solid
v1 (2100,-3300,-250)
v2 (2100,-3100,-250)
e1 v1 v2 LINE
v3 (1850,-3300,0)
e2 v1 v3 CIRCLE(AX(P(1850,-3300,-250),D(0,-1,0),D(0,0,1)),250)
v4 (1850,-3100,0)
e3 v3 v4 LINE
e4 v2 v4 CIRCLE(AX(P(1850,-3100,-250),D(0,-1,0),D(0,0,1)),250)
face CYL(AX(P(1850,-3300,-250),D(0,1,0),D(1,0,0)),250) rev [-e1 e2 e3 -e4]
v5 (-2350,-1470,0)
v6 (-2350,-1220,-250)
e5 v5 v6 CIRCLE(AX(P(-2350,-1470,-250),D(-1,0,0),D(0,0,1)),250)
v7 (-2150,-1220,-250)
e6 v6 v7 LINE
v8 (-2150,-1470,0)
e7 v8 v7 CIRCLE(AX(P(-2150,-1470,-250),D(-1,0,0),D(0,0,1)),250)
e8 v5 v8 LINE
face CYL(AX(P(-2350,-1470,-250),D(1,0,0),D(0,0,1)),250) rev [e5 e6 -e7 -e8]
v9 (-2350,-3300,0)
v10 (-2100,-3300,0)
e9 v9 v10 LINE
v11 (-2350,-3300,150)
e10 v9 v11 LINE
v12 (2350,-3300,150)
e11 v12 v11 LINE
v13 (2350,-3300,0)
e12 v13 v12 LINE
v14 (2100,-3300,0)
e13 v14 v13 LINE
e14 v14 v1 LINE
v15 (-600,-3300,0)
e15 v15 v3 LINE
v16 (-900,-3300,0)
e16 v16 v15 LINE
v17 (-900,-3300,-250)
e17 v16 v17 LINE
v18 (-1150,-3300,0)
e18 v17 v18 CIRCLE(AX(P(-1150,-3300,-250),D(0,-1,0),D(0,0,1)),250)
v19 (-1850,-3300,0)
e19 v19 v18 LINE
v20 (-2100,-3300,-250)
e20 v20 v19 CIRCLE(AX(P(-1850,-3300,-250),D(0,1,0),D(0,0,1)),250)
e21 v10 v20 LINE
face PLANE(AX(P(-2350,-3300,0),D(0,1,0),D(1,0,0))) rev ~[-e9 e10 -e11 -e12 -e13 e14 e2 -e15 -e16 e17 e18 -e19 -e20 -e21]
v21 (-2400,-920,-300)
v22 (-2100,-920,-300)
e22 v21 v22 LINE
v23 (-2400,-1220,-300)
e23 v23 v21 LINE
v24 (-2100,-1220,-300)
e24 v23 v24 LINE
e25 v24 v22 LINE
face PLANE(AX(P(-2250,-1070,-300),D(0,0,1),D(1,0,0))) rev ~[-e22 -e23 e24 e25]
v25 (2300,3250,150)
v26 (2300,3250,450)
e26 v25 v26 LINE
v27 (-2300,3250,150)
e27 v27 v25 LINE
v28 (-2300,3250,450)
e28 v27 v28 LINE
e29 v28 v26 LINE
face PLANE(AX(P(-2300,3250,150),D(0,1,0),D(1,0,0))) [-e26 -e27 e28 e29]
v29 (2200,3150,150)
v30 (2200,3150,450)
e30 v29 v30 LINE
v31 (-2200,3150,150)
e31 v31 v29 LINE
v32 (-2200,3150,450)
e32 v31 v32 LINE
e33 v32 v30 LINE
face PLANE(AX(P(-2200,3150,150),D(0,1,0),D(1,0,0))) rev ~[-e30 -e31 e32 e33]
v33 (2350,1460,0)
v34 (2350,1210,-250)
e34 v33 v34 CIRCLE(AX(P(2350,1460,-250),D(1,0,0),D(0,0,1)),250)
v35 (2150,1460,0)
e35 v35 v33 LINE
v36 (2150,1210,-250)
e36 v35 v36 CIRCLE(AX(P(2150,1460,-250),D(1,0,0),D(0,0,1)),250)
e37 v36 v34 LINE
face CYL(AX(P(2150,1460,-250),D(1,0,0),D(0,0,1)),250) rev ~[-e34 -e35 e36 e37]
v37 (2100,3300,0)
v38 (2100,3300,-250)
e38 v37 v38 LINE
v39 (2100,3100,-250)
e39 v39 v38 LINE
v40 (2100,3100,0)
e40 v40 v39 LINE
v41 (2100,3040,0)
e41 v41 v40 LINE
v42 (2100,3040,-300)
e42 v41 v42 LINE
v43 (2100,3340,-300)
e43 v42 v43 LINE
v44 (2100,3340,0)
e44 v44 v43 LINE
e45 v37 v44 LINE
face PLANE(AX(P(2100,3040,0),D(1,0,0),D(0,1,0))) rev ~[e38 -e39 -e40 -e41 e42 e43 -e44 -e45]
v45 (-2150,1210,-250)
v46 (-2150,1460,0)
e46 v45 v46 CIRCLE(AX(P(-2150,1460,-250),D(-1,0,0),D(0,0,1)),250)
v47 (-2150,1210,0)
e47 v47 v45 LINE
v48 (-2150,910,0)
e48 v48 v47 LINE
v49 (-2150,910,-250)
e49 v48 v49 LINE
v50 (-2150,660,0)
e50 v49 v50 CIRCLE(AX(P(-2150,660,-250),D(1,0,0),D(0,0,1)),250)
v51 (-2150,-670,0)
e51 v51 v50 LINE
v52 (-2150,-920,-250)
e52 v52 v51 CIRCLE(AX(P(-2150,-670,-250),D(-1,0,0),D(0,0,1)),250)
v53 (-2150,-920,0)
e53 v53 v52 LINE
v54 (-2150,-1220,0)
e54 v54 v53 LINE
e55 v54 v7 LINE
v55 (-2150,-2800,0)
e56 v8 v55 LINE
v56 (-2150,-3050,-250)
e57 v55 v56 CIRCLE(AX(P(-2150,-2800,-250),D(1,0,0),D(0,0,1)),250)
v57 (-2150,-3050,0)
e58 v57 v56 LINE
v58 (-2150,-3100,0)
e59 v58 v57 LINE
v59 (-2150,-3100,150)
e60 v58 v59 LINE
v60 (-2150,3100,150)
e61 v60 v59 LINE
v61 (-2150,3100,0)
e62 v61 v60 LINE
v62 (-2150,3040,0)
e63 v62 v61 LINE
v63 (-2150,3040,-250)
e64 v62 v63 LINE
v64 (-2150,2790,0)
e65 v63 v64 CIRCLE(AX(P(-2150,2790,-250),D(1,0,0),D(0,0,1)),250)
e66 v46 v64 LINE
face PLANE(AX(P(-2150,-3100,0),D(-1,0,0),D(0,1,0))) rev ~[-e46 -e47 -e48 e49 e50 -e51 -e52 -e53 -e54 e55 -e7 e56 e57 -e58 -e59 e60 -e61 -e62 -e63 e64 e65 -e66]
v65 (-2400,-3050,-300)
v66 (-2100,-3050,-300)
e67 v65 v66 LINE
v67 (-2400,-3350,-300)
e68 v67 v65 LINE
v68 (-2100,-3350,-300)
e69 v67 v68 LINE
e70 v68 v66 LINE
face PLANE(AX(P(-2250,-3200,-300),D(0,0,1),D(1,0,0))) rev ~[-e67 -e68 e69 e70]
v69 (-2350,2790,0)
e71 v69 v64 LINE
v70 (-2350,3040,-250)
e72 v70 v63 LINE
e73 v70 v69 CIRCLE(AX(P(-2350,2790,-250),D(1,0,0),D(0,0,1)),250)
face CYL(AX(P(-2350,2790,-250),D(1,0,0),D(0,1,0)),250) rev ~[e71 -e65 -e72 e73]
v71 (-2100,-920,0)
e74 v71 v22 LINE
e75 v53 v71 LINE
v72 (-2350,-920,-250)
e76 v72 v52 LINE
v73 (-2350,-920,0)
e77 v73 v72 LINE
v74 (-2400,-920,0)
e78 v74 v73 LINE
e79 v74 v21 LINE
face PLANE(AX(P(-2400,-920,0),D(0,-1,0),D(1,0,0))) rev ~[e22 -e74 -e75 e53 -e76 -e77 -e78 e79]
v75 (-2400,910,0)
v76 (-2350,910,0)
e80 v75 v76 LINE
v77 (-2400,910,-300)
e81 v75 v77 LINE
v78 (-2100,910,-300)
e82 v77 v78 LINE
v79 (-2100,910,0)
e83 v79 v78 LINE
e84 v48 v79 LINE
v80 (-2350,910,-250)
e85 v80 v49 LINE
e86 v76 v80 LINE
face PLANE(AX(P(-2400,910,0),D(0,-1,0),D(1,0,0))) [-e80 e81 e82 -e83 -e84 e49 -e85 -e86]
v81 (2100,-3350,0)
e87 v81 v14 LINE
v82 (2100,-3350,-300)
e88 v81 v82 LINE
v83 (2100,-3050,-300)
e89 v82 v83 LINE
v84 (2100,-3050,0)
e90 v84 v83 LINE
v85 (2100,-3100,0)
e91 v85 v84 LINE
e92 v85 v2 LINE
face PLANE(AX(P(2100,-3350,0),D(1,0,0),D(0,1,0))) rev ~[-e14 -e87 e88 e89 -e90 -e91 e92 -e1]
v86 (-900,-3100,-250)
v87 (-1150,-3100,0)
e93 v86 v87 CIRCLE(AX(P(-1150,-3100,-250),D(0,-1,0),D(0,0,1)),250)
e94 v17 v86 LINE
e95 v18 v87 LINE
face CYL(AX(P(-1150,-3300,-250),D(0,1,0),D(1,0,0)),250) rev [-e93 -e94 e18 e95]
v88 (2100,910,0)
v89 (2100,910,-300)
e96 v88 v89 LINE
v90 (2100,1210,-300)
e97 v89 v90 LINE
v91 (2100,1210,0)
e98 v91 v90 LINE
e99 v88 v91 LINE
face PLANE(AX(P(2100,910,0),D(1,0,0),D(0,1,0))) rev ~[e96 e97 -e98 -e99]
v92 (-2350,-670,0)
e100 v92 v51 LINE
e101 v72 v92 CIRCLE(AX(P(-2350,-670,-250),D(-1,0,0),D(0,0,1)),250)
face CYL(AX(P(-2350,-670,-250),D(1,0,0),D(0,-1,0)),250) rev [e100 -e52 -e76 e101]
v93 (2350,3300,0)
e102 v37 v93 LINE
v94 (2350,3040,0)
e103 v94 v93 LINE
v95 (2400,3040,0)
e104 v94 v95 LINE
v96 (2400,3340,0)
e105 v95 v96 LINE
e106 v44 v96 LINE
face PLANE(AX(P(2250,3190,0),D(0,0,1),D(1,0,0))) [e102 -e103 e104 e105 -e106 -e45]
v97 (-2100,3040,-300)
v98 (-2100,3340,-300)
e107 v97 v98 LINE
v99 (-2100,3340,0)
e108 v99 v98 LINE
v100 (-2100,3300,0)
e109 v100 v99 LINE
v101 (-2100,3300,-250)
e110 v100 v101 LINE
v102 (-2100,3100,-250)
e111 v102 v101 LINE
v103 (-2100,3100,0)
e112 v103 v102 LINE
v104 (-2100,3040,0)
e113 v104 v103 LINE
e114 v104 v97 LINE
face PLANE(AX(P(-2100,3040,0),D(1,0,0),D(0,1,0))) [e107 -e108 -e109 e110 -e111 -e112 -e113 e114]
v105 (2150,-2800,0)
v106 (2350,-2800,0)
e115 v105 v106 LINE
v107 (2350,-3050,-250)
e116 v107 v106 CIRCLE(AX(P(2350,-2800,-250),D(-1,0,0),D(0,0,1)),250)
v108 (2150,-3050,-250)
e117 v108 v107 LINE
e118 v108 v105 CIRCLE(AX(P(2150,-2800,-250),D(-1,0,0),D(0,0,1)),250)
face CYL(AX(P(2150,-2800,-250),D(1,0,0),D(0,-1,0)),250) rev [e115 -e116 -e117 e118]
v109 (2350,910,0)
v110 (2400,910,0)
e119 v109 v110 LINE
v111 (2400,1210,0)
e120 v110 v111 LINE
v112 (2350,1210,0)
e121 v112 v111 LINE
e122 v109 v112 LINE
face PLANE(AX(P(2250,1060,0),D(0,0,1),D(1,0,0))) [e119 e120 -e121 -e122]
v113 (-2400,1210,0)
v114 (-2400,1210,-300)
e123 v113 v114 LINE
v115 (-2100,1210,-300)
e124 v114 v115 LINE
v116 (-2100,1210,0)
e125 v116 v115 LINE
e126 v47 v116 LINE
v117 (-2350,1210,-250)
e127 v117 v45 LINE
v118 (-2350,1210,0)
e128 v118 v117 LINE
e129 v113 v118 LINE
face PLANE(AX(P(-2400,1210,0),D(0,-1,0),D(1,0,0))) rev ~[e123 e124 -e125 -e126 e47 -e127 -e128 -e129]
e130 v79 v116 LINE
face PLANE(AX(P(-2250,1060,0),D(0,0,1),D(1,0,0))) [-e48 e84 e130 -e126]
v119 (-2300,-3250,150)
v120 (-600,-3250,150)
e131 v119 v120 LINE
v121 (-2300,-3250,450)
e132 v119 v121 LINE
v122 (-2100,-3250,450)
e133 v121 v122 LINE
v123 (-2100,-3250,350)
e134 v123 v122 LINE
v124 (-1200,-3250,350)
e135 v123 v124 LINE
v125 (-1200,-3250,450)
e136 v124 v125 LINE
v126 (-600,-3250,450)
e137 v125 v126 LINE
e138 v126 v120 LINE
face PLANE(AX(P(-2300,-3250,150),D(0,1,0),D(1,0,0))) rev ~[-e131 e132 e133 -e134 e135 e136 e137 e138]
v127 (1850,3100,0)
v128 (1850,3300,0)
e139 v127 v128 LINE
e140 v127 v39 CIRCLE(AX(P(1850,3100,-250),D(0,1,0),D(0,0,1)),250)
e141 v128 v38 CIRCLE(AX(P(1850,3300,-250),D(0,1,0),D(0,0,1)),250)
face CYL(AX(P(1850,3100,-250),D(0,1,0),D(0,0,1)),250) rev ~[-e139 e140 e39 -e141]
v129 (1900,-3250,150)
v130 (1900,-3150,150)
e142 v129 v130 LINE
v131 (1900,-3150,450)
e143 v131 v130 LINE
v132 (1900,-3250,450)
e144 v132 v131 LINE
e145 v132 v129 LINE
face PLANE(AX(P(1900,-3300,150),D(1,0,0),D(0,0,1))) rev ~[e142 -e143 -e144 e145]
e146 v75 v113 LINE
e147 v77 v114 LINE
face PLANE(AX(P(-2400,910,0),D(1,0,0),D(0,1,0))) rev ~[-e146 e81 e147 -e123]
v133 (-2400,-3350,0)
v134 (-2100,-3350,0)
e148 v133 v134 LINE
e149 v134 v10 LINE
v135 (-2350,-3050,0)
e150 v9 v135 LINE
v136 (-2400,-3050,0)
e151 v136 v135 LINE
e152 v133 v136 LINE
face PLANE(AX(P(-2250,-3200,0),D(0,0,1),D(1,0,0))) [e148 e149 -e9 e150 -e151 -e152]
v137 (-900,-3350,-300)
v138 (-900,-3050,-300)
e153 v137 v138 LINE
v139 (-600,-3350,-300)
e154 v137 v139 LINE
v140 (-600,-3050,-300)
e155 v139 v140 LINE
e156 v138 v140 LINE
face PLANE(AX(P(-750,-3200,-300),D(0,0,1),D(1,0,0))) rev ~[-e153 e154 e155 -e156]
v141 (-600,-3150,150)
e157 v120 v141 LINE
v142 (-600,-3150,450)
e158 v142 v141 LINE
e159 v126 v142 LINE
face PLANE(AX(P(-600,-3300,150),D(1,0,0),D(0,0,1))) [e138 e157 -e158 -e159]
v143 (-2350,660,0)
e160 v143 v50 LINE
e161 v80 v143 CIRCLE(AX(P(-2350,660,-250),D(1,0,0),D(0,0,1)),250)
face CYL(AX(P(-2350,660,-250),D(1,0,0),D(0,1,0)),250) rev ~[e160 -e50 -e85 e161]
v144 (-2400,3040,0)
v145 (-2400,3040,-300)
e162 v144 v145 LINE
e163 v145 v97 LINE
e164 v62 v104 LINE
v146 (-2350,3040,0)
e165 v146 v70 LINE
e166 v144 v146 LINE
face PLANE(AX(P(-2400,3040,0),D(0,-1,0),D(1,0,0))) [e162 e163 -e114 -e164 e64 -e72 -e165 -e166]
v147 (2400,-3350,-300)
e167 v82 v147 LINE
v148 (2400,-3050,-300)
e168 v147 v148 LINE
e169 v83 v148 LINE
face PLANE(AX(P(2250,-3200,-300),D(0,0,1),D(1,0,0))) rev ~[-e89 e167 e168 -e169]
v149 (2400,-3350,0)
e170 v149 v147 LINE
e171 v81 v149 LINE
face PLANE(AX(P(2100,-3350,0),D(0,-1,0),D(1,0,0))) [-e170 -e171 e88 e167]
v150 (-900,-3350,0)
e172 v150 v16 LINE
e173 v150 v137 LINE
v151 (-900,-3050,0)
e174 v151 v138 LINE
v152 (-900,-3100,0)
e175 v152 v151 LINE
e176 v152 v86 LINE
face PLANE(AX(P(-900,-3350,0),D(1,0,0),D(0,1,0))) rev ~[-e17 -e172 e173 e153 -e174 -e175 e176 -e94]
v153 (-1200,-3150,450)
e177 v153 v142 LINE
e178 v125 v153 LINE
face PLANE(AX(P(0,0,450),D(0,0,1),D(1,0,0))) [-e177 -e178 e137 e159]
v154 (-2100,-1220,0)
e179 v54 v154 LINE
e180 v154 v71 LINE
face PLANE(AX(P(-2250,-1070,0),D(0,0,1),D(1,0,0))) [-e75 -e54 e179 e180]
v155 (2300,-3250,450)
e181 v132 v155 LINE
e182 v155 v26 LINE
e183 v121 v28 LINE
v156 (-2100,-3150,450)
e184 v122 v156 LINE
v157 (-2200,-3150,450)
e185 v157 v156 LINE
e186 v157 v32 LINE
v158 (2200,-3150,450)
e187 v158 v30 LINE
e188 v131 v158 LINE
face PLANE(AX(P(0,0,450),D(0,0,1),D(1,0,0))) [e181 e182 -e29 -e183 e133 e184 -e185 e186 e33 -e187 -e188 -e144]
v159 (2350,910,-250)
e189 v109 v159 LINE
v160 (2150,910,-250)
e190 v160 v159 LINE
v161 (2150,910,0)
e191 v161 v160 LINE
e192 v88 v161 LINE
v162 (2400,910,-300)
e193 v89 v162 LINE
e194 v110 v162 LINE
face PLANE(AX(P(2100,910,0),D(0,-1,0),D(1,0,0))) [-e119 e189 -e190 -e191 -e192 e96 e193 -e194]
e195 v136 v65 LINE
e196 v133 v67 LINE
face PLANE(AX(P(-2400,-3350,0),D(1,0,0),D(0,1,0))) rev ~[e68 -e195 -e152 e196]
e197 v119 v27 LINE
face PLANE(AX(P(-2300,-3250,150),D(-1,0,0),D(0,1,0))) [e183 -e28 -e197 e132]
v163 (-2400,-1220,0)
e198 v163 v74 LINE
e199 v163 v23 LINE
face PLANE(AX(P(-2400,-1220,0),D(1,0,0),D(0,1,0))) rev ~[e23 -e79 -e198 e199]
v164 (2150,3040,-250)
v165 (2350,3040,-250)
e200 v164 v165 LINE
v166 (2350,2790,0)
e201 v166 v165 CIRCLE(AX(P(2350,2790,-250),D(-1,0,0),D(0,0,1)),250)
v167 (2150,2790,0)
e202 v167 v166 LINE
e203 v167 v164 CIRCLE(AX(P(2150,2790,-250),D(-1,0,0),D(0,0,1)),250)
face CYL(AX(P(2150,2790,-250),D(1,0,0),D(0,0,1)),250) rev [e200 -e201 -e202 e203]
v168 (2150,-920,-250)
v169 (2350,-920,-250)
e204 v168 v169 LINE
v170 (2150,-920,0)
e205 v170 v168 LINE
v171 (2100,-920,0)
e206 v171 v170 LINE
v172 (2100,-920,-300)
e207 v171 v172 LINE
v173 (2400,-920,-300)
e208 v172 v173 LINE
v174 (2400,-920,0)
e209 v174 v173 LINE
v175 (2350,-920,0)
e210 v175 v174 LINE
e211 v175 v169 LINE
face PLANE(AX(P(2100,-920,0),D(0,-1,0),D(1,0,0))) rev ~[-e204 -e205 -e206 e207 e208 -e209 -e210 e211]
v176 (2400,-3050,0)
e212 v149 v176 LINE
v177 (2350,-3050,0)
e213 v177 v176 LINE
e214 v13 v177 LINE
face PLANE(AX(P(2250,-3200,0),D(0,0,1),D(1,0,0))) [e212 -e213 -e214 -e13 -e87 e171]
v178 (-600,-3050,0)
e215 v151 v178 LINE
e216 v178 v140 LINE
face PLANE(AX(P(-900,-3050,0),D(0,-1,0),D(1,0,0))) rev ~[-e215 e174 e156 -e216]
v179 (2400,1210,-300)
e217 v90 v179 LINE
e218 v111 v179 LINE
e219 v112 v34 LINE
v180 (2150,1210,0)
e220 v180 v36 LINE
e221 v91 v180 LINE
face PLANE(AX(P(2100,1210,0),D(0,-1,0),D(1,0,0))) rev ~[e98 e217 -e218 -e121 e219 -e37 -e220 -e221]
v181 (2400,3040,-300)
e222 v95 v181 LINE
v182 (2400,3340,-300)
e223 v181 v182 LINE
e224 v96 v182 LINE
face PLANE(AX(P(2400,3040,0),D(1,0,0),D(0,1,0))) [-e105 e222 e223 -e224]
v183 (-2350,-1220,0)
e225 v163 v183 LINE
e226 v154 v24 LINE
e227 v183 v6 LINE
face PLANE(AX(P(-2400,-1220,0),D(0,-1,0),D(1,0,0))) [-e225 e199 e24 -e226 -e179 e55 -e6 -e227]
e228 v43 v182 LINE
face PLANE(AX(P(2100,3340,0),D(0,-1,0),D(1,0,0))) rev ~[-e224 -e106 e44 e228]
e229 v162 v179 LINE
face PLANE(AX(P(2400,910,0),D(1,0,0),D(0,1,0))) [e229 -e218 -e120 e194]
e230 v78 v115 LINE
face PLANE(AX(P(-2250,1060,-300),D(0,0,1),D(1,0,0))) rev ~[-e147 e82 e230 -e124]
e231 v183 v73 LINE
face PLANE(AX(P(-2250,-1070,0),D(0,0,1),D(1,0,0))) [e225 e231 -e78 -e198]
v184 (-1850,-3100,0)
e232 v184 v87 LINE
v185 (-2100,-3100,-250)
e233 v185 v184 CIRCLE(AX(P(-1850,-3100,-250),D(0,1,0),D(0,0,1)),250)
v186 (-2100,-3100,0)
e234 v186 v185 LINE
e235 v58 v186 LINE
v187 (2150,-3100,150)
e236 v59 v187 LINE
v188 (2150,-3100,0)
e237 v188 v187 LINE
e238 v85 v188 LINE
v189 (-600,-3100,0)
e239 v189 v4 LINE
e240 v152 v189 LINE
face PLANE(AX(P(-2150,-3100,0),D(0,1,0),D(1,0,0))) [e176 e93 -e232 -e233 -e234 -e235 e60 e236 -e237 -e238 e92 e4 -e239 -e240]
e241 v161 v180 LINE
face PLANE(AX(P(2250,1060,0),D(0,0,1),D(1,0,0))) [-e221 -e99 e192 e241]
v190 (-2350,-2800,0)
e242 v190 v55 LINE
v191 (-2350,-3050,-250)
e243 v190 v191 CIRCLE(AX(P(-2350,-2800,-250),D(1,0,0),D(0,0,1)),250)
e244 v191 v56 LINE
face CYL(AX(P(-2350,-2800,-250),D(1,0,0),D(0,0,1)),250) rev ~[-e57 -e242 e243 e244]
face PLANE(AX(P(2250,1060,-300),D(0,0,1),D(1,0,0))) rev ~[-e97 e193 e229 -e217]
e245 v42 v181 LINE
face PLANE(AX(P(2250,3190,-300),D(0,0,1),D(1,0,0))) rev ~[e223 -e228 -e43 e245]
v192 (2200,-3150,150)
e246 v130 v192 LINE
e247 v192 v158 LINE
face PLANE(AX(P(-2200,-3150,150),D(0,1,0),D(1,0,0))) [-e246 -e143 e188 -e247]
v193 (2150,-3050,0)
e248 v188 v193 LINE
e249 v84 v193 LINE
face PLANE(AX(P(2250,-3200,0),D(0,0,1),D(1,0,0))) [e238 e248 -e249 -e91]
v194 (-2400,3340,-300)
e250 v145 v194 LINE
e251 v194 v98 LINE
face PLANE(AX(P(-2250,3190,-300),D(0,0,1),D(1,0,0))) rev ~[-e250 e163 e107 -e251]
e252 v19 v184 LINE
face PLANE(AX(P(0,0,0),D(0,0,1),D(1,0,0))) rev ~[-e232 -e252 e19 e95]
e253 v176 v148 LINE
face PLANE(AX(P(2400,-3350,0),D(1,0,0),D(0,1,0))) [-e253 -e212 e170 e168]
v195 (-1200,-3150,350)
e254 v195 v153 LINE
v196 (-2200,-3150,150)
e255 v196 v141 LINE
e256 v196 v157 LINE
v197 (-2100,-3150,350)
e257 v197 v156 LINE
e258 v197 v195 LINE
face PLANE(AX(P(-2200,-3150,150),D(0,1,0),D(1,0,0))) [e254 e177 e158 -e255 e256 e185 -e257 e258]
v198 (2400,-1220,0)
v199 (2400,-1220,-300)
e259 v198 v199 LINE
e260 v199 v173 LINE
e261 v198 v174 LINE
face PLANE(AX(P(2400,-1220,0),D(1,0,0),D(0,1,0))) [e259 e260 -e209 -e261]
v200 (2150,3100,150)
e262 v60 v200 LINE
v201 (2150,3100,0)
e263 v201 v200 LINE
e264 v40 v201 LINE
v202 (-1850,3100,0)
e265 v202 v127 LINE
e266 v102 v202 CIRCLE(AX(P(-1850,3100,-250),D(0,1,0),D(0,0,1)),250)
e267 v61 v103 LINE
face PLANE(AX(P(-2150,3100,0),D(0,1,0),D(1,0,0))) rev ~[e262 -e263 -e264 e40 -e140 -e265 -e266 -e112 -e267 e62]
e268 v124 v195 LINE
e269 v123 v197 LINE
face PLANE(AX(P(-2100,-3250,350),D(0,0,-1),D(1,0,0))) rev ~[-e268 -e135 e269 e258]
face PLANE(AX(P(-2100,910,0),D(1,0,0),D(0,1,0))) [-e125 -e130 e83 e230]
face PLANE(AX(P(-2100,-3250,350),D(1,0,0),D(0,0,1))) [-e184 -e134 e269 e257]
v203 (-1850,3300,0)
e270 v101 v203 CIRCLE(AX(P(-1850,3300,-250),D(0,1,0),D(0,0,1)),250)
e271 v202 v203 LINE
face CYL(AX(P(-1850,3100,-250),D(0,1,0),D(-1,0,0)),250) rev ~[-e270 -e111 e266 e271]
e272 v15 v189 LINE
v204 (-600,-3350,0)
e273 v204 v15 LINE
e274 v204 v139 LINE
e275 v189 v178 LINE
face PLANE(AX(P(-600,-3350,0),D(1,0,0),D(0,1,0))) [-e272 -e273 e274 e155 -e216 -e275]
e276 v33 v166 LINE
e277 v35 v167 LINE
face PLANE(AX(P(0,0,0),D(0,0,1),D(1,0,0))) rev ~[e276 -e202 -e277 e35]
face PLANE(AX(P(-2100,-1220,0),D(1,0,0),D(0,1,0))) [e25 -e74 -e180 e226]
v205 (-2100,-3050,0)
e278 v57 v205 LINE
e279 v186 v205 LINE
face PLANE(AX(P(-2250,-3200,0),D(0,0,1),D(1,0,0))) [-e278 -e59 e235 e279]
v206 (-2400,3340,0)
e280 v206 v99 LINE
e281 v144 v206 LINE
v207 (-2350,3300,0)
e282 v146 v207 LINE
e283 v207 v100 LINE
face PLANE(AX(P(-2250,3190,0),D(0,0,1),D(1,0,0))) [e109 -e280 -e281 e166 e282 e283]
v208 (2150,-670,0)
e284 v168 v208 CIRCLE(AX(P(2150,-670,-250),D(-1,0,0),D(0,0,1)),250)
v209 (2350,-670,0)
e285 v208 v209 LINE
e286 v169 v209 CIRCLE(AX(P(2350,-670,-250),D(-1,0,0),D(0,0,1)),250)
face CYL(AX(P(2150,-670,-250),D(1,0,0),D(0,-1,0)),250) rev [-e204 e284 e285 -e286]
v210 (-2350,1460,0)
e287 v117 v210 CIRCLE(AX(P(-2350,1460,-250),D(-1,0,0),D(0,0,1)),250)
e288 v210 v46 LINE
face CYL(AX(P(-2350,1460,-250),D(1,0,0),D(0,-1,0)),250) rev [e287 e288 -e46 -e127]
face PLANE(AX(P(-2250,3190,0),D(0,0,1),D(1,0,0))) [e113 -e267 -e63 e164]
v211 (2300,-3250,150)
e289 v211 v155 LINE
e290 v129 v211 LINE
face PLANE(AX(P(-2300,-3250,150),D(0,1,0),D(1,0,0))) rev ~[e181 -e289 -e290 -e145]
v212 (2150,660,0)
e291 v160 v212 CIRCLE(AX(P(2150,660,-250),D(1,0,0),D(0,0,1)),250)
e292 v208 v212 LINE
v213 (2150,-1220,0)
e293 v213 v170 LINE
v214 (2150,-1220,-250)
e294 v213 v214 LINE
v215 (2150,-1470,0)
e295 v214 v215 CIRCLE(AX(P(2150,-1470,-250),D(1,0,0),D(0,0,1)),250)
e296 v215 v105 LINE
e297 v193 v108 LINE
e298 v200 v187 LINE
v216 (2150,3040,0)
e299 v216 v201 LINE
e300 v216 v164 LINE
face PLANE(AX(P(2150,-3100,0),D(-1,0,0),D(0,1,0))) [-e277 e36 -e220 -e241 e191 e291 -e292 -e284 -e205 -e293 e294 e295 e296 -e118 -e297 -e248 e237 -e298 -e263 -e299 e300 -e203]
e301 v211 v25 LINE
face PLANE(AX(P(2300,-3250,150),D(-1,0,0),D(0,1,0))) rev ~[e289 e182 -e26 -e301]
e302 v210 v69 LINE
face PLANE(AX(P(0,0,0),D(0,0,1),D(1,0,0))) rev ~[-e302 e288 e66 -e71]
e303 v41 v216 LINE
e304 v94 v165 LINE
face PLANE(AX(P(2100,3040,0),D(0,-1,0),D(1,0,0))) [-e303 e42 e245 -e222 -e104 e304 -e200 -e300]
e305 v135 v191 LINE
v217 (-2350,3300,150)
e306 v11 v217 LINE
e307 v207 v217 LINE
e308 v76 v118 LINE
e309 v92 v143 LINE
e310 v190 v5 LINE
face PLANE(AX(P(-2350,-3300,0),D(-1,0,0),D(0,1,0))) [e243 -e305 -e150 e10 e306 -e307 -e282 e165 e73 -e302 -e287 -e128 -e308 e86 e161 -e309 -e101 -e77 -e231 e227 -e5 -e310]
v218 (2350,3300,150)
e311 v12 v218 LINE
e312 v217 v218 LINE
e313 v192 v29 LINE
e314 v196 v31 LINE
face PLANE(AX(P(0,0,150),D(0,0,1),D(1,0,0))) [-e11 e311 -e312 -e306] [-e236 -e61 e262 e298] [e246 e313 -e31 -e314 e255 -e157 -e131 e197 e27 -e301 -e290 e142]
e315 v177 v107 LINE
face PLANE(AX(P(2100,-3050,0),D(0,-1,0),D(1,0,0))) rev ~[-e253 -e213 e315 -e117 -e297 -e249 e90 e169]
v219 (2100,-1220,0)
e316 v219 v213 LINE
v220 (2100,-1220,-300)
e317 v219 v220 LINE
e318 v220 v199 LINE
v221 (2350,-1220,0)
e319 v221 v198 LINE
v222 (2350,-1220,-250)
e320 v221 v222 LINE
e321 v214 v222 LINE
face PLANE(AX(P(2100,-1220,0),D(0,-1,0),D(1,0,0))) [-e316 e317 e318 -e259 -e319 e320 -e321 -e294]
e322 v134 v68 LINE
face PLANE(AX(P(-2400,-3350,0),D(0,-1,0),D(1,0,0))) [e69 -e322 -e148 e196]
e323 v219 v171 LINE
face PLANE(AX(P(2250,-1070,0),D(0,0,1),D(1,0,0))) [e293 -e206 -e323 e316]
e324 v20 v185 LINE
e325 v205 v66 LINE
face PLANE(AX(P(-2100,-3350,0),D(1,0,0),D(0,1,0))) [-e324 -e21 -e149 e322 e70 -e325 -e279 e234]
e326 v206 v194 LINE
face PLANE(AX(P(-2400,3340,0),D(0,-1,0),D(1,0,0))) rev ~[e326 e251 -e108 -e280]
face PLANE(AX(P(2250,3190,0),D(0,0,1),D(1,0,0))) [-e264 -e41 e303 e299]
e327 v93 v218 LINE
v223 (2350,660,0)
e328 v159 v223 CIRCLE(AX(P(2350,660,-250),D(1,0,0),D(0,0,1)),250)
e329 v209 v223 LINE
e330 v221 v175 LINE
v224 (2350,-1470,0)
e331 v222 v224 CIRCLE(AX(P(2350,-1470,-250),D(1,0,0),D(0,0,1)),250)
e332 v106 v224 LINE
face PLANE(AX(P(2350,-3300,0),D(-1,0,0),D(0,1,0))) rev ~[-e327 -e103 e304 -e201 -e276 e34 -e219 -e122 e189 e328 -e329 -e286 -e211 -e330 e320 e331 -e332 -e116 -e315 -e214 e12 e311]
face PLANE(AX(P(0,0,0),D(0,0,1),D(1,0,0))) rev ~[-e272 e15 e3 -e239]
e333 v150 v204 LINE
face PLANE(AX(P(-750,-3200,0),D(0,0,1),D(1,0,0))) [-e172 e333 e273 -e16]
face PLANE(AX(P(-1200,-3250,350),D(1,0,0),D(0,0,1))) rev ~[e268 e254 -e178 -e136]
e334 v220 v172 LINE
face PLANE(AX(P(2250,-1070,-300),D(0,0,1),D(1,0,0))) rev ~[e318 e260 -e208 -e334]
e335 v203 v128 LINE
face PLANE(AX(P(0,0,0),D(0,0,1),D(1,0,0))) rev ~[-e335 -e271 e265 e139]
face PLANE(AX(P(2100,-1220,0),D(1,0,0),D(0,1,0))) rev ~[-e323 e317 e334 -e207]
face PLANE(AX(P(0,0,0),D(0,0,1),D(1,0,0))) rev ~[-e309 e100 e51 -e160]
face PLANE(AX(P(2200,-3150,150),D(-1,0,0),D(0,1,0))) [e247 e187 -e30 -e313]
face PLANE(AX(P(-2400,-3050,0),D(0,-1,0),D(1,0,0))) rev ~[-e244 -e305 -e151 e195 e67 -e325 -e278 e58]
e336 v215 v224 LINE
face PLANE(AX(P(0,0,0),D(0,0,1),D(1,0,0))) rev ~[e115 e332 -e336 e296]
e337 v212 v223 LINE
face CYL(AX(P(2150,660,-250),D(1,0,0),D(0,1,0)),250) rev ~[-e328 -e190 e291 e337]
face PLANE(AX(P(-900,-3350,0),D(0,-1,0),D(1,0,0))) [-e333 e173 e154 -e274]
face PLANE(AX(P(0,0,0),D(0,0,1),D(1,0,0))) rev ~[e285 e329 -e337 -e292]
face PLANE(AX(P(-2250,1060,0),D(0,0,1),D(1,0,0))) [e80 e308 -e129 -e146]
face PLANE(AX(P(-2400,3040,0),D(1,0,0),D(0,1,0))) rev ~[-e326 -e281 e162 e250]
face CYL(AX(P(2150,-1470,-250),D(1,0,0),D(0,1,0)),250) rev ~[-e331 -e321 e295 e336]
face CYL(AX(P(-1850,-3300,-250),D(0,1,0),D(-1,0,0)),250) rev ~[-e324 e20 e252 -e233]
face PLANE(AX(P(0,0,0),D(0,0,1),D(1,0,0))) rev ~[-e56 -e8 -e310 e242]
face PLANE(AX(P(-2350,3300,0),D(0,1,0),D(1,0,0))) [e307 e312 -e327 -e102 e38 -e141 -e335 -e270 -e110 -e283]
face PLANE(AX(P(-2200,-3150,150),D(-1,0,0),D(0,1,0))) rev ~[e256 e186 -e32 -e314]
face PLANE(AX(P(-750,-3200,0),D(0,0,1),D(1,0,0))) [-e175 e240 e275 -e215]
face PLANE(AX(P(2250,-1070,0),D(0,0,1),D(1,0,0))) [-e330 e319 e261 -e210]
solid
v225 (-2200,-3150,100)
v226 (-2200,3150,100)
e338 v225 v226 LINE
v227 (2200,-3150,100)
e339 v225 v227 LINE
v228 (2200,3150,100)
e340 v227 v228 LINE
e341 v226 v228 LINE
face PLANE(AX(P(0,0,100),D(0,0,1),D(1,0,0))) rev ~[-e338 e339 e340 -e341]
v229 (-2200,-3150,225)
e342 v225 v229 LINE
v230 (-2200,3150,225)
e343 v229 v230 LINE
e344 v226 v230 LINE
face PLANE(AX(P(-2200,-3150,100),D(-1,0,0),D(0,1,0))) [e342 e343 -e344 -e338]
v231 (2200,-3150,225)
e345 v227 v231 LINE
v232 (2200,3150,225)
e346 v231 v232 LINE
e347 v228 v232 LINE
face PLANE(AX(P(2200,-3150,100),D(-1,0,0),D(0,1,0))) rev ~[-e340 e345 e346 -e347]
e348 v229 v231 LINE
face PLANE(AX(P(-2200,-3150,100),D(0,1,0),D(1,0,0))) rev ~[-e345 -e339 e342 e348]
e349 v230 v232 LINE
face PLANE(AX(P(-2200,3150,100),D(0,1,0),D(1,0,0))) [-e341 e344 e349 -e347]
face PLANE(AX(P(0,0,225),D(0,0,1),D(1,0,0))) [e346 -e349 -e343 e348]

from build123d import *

# Parameters (mm, degrees)
F0_W      = 4700
F0_H      = 6600
F0_W_2    = 4300
F0_H_2    = 6200
F1_DEPTH  = 150
F2_W      = 4600
F2_H      = 6500
F2_W_2    = 4400
F2_H_2    = 6300
F3_DEPTH  = 300
F4_W      = 300
F4_H      = 300
F5_DEPTH  = 300
F6_W      = 2500
F6_H      = 500
F7_DEPTH  = 500
F9_W      = 4400
F9_H      = 6300
F10_DEPTH = 125
F11_R     = 250
F12_W     = 900
F12_H     = 100
F13_DEPTH = 100


with BuildPart() as f1:
    # F0 (on Top) → F1 (new body)
    with BuildSketch(Plane.XY):
        Rectangle(F0_W, F0_H)
        Rectangle(F0_W_2, F0_H_2, mode=Mode.SUBTRACT)
    extrude(amount=F1_DEPTH)

    # F2 (on face) → F3 (join)
    with BuildSketch(Plane.XY.offset(150)):
        Rectangle(F2_W, F2_H)
        Rectangle(F2_W_2, F2_H_2, mode=Mode.SUBTRACT)
    extrude(amount=F3_DEPTH)

    # F4 (on Top) → F5 (join)
    with BuildSketch(Plane.XY):
        with Locations((-2250, -3200)):
            Rectangle(F4_W, F4_H)
        with Locations((-2250, -1070)):
            Rectangle(F4_W, F4_H)
        with Locations((2250, -3200)):
            Rectangle(F4_W, F4_H)
        with Locations((2250, -1070)):
            Rectangle(F4_W, F4_H)
        with Locations((-2250, 1060)):
            Rectangle(F4_W, F4_H)
        with Locations((-2250, 3190)):
            Rectangle(F4_W, F4_H)
        with Locations((2250, 1060)):
            Rectangle(F4_W, F4_H)
        with Locations((2250, 3190)):
            Rectangle(F4_W, F4_H)
        with Locations((-750, -3200)):
            Rectangle(F4_W, F4_H)
    extrude(amount=-F5_DEPTH)

    # F6 (on face) + F1_face2 (on face) → F7 (cut)
    with BuildSketch(Plane.XZ.offset(3300)):
        with Locations((650, 400)):
            Rectangle(F6_W, F6_H)
    with BuildSketch(Plane(origin=(0, -3100, 75), x_dir=(-1, 0, 0), z_dir=(0, 1, 0))):
        Polygon((-2150, 75), (-2150, -75), (-2100, -75), (600, -75), (900, -75), (2100, -75), (2150, -75), (2150, 75), align=None)
    extrude(amount=-F7_DEPTH, dir=(0, -1, 0), mode=Mode.SUBTRACT)

    # F11
    f11_edges = [f1.edges().sort_by_distance(p)[0] for p in [
        (-2100, 3200, 0),
        (-2250, 3040, 0),
        (-2250, 1210, 0),
        (-2250, 910, 0),
        (-2250, -1220, 0),
        (-2250, -920, 0),
        (-2250, -3050, 0),
        (-900, -3200, 0),
        (-2100, -3200, 0),
        (2100, -3200, 0),
        (2250, -1220, 0),
        (2250, 910, 0),
        (2250, 3040, 0),
        (2100, 3200, 0),
        (2250, -3050, 0),
        (2250, -920, 0),
        (2250, 1210, 0),
    ]]
    fillet(f11_edges, radius=F11_R)

    # F12 (on face) → F13 (cut, through all)
    with BuildSketch(Plane.XZ.offset(3250)):
        with Locations((-1650, 400)):
            Rectangle(F12_W, F12_H)
    extrude(amount=-F13_DEPTH, mode=Mode.SUBTRACT)


with BuildPart() as f10:
    # F9 (on offset) → F10 (new body)
    with BuildSketch(Plane.XY.offset(100)):
        Rectangle(F9_W, F9_H)
    extrude(amount=F10_DEPTH)


solid = Compound([f1.part, f10.part])
